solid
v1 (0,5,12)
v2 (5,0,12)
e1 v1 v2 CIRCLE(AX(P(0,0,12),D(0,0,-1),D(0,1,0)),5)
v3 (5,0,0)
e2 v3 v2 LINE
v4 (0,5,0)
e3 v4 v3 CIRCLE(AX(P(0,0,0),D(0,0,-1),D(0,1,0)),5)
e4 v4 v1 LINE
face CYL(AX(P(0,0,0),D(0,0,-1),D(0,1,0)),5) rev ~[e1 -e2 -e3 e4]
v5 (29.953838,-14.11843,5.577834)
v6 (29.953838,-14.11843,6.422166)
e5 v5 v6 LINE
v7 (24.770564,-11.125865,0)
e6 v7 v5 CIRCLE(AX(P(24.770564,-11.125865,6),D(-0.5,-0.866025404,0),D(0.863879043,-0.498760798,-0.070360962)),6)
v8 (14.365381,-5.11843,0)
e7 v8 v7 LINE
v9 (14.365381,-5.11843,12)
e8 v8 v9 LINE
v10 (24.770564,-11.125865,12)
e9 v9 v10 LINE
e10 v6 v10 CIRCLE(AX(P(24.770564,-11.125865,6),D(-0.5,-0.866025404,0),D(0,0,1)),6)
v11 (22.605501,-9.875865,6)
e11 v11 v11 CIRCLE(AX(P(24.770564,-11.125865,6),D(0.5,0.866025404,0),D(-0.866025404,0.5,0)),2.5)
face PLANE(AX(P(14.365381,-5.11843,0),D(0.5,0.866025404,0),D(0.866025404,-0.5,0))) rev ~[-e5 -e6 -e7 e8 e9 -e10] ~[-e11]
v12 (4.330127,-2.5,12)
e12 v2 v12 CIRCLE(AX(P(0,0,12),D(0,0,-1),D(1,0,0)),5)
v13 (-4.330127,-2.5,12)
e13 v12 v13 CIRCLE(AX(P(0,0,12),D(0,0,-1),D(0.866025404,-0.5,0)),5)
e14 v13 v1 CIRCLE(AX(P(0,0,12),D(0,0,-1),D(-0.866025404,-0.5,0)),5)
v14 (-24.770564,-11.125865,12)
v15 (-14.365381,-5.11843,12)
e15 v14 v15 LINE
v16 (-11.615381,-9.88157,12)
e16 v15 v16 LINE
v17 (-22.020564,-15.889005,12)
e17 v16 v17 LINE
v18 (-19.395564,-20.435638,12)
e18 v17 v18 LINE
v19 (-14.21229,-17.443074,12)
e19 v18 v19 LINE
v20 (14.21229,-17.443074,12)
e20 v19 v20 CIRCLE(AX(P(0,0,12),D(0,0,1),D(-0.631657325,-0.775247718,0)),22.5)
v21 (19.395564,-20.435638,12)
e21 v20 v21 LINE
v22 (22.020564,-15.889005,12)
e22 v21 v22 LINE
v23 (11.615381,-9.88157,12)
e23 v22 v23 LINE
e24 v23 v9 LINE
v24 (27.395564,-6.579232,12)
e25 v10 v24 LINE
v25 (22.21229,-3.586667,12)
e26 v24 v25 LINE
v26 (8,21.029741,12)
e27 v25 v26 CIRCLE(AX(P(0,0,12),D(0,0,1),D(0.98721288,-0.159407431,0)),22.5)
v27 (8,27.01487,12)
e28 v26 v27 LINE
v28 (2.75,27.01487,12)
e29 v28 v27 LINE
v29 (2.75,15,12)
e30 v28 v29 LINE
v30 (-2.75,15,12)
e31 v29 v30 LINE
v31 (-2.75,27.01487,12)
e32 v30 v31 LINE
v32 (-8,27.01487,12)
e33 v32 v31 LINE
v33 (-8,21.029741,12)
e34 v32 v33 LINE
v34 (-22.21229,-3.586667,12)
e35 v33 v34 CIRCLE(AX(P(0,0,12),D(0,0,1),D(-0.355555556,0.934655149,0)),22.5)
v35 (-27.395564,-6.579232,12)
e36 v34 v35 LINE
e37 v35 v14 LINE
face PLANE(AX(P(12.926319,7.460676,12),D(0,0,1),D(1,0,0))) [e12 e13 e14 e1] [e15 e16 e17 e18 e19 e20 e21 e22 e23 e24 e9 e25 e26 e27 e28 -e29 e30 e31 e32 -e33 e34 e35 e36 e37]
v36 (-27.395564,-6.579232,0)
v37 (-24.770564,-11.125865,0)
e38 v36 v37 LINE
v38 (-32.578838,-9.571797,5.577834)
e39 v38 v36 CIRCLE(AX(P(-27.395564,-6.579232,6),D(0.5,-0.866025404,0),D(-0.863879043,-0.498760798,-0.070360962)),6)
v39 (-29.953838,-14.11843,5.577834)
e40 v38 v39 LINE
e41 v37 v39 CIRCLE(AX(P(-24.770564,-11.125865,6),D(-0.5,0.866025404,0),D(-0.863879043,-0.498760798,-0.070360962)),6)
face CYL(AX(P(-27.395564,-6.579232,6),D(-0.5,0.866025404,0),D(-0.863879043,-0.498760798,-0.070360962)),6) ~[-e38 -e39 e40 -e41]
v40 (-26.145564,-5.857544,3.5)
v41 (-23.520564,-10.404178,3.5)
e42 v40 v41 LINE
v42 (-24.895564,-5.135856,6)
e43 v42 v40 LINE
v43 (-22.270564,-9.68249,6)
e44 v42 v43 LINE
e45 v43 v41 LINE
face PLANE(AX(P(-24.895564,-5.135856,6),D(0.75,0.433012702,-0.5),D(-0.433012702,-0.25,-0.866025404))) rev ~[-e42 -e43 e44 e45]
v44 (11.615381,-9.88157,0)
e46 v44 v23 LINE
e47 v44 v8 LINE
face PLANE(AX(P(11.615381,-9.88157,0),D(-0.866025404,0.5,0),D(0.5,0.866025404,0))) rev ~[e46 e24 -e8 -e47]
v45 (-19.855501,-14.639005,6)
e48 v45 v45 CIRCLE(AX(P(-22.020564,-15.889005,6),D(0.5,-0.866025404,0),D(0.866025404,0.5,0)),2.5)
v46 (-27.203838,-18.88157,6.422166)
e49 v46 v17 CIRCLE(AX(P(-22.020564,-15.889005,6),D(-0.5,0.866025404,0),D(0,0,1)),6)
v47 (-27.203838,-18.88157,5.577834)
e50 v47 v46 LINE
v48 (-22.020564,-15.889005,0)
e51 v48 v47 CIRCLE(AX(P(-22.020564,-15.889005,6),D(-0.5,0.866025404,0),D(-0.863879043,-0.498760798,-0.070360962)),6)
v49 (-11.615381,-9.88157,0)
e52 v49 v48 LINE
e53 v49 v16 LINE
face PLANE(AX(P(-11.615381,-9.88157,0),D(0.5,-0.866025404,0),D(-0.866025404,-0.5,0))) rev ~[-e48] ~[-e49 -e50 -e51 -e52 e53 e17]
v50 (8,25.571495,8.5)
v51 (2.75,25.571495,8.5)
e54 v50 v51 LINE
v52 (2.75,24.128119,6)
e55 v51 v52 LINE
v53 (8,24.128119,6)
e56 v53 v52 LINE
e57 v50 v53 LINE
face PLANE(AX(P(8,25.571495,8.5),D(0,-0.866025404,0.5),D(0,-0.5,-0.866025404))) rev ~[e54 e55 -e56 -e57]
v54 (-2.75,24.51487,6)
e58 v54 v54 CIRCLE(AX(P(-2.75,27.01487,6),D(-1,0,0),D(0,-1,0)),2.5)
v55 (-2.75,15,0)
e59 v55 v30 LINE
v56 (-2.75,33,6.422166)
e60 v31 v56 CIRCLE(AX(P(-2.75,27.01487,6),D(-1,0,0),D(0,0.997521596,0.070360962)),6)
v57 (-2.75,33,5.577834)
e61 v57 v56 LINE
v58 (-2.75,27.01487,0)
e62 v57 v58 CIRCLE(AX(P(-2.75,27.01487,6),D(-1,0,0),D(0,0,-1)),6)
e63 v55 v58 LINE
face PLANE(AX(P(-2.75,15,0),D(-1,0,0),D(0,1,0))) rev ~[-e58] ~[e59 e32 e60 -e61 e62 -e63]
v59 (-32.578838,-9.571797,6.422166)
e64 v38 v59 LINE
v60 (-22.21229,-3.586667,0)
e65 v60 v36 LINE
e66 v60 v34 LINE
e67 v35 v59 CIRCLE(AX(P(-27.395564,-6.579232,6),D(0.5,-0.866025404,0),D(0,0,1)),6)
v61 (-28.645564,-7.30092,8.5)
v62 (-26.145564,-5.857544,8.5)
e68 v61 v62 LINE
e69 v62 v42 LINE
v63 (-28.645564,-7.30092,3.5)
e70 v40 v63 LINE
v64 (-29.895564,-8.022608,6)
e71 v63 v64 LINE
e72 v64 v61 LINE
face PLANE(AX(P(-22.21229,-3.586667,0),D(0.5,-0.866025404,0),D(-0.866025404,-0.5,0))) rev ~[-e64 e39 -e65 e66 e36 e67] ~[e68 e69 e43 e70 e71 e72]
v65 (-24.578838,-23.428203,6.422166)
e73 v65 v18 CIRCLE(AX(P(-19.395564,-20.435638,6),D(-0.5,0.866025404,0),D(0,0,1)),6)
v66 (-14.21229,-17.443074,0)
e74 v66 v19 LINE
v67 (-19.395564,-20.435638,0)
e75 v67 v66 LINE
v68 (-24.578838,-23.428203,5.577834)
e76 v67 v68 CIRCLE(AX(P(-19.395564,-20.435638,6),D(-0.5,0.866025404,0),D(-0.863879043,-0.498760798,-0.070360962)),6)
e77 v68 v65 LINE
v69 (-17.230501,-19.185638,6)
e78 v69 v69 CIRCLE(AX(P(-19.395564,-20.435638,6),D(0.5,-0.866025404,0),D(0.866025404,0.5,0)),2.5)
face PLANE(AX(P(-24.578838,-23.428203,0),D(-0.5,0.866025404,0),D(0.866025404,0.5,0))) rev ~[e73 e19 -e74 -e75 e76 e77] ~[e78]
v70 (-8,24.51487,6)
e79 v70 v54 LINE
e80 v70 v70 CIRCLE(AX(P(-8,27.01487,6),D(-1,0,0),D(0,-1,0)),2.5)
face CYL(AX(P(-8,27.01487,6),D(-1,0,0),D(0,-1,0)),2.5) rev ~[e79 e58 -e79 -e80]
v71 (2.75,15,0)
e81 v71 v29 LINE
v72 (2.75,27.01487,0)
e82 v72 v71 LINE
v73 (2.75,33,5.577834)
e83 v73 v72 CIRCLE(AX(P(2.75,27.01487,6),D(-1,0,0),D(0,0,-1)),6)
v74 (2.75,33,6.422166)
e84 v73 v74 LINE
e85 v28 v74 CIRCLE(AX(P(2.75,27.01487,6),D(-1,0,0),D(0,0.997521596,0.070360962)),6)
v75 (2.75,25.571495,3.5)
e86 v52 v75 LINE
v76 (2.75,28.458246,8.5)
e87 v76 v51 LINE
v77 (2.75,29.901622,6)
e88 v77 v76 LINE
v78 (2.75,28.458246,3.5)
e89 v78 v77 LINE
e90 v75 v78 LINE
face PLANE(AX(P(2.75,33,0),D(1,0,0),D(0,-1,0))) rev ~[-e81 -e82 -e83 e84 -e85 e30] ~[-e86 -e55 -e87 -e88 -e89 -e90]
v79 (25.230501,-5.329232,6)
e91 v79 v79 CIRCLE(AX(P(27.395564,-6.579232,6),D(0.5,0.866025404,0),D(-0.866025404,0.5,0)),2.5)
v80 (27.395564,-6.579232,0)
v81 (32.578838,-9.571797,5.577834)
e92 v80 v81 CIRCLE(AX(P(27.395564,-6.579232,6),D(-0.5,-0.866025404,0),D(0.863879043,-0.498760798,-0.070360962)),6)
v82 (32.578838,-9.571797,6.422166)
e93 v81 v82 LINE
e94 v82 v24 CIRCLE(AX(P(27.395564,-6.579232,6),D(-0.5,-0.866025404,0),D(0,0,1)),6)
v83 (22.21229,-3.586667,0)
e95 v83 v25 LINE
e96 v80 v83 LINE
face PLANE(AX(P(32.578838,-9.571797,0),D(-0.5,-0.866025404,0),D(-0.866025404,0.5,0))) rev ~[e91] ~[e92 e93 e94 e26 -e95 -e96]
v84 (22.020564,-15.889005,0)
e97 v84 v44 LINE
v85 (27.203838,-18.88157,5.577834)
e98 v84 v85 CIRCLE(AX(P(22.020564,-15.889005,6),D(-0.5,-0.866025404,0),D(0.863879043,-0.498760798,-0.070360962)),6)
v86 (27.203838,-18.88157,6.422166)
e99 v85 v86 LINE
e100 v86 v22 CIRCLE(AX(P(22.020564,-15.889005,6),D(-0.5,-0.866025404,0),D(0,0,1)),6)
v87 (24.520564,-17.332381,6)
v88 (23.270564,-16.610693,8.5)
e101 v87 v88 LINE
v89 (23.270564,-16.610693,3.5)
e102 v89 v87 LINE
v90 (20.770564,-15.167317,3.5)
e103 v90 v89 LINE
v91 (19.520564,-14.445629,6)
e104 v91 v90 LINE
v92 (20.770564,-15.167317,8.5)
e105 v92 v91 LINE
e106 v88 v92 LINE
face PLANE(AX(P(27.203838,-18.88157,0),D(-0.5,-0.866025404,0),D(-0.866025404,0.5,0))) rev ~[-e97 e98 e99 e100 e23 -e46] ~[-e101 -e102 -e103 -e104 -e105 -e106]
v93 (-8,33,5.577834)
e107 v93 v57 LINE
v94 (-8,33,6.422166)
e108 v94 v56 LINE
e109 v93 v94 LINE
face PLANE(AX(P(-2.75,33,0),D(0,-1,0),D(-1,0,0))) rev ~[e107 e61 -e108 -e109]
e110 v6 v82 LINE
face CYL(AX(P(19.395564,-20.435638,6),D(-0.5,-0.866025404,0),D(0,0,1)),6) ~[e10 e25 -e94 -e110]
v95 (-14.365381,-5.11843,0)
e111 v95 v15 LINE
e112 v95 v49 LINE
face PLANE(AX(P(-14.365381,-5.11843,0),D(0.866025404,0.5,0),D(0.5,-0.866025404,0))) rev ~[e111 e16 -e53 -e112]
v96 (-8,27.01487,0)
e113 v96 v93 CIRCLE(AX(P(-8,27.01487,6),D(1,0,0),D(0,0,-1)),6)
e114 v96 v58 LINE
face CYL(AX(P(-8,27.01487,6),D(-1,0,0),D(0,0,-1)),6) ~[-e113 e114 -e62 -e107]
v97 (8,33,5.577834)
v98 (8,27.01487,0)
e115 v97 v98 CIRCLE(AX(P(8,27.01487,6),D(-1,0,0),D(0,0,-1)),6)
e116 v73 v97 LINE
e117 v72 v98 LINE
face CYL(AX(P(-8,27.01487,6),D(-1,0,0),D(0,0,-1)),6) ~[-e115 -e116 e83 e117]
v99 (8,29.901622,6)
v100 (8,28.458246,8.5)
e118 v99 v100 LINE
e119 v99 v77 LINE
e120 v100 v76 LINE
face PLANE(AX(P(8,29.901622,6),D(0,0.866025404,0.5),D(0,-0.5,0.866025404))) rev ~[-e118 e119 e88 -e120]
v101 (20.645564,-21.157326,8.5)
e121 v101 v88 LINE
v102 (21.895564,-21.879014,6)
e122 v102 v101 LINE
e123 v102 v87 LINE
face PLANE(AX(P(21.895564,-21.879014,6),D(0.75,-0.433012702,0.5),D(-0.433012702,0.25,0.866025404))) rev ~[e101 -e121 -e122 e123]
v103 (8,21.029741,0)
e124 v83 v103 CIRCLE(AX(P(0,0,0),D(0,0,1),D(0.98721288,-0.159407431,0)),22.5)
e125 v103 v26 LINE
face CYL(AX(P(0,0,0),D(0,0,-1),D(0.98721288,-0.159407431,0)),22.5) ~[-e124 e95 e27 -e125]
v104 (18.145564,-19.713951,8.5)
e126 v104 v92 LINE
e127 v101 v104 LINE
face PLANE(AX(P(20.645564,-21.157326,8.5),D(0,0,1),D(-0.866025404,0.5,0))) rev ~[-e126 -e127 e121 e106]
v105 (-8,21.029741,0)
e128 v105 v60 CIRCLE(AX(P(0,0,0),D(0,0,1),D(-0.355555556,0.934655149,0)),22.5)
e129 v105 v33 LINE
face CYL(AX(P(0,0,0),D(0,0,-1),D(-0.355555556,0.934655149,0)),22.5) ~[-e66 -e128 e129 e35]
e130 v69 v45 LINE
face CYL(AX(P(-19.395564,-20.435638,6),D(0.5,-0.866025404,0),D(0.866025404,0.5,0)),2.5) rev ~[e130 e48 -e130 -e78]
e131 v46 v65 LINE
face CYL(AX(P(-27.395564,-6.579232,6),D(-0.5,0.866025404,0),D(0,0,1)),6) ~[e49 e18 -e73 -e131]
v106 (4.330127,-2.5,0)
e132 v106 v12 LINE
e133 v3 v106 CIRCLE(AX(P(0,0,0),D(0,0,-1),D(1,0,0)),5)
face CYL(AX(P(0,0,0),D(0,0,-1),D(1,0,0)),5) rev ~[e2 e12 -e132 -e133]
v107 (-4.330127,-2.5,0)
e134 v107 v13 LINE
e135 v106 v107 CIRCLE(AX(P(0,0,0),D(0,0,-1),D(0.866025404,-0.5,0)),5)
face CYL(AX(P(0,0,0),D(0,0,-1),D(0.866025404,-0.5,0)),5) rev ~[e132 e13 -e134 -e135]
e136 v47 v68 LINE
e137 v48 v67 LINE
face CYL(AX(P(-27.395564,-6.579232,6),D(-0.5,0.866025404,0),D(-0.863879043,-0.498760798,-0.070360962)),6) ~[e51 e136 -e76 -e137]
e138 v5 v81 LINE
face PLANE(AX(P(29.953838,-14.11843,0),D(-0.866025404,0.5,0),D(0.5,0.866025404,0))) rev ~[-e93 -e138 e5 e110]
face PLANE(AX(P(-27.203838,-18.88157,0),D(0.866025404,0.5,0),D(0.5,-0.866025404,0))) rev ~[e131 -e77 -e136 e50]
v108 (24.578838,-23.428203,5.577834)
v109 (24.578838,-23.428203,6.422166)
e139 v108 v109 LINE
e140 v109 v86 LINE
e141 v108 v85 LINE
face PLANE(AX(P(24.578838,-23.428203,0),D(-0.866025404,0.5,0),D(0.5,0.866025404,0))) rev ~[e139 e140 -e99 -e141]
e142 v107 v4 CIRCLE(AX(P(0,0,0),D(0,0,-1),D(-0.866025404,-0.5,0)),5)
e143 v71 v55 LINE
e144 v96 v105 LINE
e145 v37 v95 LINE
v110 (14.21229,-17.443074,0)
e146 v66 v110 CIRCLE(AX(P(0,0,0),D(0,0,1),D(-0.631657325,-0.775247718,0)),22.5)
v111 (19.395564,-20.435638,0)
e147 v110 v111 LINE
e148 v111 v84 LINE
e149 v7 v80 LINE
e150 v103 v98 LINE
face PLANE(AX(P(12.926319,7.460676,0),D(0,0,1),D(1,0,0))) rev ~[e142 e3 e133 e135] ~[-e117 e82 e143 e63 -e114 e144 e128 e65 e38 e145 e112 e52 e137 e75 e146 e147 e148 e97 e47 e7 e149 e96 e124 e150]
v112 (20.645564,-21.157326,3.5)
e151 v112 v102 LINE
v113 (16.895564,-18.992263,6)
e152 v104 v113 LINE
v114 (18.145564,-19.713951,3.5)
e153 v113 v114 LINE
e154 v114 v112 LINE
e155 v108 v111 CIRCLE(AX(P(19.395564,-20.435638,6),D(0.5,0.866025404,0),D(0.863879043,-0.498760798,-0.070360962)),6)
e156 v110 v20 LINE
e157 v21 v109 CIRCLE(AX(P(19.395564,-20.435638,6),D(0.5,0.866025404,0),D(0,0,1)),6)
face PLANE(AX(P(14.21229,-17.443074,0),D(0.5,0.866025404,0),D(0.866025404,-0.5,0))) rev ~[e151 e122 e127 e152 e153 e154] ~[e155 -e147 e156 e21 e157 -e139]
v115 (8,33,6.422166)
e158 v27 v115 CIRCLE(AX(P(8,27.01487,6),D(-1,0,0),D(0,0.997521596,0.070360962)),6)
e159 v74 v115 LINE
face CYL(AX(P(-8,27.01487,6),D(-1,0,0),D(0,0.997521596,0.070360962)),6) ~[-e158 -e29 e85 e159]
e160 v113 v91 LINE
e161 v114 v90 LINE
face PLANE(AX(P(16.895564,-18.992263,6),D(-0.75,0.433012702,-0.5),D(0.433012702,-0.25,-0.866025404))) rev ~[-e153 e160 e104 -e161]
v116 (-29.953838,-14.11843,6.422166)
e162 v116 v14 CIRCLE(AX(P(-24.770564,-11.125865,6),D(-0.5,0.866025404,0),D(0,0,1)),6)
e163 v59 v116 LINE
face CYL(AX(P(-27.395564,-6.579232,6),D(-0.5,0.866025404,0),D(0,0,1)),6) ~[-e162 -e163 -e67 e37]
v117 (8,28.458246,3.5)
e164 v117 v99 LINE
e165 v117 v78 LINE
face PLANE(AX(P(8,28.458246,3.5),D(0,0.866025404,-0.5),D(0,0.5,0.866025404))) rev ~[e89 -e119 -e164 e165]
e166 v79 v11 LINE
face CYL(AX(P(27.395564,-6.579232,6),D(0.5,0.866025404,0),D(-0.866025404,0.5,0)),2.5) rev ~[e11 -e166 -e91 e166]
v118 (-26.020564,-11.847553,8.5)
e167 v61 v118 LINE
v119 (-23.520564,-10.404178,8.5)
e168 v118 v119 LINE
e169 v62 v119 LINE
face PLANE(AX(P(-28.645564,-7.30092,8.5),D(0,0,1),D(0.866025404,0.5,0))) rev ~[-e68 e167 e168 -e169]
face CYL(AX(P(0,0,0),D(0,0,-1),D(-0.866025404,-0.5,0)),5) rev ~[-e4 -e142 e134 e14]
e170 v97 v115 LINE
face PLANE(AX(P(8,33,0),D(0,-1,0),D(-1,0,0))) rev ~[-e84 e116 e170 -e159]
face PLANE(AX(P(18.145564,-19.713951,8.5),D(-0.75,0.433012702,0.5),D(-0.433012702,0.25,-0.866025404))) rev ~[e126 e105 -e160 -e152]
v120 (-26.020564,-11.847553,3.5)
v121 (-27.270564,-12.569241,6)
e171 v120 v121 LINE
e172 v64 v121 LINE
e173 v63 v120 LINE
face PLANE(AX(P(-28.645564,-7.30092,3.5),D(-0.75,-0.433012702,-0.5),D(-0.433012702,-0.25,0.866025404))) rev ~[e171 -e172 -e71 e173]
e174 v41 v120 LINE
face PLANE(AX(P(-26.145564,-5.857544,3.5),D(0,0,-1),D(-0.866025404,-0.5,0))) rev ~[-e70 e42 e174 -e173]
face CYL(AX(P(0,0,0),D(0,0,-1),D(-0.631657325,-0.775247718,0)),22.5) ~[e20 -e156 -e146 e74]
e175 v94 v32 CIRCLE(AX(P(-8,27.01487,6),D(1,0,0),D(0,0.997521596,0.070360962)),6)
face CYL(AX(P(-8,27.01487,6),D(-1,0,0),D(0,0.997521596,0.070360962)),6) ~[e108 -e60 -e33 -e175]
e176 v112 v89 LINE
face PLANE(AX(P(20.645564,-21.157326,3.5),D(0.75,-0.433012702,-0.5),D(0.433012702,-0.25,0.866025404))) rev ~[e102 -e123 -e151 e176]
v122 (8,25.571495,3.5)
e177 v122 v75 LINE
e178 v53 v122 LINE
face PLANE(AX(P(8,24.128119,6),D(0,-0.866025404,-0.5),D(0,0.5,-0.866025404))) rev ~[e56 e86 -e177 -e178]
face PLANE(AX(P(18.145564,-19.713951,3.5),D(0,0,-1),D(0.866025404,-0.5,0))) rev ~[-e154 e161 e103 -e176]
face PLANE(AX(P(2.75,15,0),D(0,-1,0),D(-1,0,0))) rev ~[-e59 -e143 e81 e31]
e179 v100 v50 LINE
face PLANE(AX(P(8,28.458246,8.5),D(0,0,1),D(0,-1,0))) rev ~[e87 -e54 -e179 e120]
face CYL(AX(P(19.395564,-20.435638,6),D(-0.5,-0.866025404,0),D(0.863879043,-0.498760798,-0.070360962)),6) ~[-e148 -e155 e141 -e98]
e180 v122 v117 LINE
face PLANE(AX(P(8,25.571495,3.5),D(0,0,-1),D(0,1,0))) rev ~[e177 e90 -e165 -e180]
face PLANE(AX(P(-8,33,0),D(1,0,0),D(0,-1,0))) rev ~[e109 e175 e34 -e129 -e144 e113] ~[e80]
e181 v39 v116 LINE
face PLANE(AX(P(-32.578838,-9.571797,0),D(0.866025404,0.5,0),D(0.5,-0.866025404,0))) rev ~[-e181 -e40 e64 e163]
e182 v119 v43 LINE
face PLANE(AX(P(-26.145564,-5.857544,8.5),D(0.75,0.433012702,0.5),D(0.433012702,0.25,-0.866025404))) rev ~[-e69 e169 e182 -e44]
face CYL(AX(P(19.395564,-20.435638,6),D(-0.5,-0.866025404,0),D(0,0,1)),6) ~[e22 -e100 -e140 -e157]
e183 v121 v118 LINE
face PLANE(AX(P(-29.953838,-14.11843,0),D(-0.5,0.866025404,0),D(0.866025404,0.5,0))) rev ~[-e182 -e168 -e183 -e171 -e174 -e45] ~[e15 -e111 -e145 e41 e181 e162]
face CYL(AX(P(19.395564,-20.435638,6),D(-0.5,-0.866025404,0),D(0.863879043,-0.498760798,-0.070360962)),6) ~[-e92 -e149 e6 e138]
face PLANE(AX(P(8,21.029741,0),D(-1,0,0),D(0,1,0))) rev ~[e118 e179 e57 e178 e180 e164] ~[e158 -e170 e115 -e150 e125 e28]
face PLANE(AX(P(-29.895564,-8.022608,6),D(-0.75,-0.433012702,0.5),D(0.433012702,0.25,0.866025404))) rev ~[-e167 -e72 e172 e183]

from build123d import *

# Parameters (mm, degrees)
F1_DEPTH  = 12
F3_DEPTH  = 25
F5_DEPTH  = 25
F7_DEPTH  = 25
F8_R      = 2.5
F9_DEPTH  = 5.6
F11_DEPTH = 7
F12_R     = 2.5
F13_DEPTH = 7
F15_DEPTH = 7
F16_R     = 2.5
F17_DEPTH = 7
F19_DEPTH = 7


with BuildPart() as f1:
    # F0 (on Top) → F1 (new body)
    with BuildSketch(Plane.XY):
        with BuildLine():
            ThreePointArc((0, 5), (3.5355339059, 3.5355339059), (5, 0))
            ThreePointArc((5, 0), (4.8296291314, -1.2940952255), (4.3301270189, -2.5))
            Line((4.3301270189, -2.5), (12.9903810568, -7.5))
            Line((12.9903810568, -7.5), (14.3653810568, -5.1184301396))
            Line((14.3653810568, -5.1184301396), (29.9538383249, -14.1184301396))
            Line((29.9538383249, -14.1184301396), (32.5788383249, -9.5717967697))
            Line((32.5788383249, -9.5717967697), (22.2122898066, -3.5866671921))
            ThreePointArc((22.2122898066, -3.5866671921), (19.4855715851, 11.25), (8, 21.0297408448))
            Line((8, 21.0297408448), (8, 33))
            Line((8, 33), (2.75, 33))
            Line((2.75, 33), (2.75, 15))
            Line((2.75, 15), (0, 15))
            Line((0, 15), (0, 5))
        make_face()
        with BuildLine():
            ThreePointArc((-4.3301270189, -2.5), (-4.3301270189, 2.5), (0, 5))
            Line((0, 5), (0, 15))
            Line((0, 15), (-2.75, 15))
            Line((-2.75, 15), (-2.75, 33))
            Line((-2.75, 33), (-8, 33))
            Line((-8, 33), (-8, 21.0297408448))
            ThreePointArc((-8, 21.0297408448), (-19.4855715851, 11.25), (-22.2122898066, -3.5866671921))
            Line((-22.2122898066, -3.5866671921), (-32.5788383249, -9.5717967697))
            Line((-32.5788383249, -9.5717967697), (-29.9538383249, -14.1184301396))
            Line((-29.9538383249, -14.1184301396), (-14.3653810568, -5.1184301396))
            Line((-14.3653810568, -5.1184301396), (-12.9903810568, -7.5))
            Line((-12.9903810568, -7.5), (-4.3301270189, -2.5))
        make_face()
        with BuildLine():
            Line((12.9903810568, -7.5), (4.3301270189, -2.5))
            ThreePointArc((4.3301270189, -2.5), (0, -5), (-4.3301270189, -2.5))
            Line((-4.3301270189, -2.5), (-12.9903810568, -7.5))
            Line((-12.9903810568, -7.5), (-11.6153810568, -9.8815698604))
            Line((-11.6153810568, -9.8815698604), (-27.2038383249, -18.8815698604))
            Line((-27.2038383249, -18.8815698604), (-24.5788383249, -23.4282032303))
            Line((-24.5788383249, -23.4282032303), (-14.2122898066, -17.4430736527))
            ThreePointArc((-14.2122898066, -17.4430736527), (0, -22.5), (14.2122898066, -17.4430736527))
            Line((14.2122898066, -17.4430736527), (24.5788383249, -23.4282032303))
            Line((24.5788383249, -23.4282032303), (27.2038383249, -18.8815698604))
            Line((27.2038383249, -18.8815698604), (11.6153810568, -9.8815698604))
            Line((11.6153810568, -9.8815698604), (12.9903810568, -7.5))
        make_face()
    extrude(amount=F1_DEPTH)

    # F2 (on face) → F3 (cut)
    with BuildSketch(Plane(origin=(-8, 0, 0), x_dir=(0, -1, 0), z_dir=(-1, 0, 0))):
        with BuildLine():
            ThreePointArc((-27.0148704224, 0), (-31.1055308437, 1.6106381651), (-33, 5.5778342276))
            Line((-33, 5.5778342276), (-33, 0))
            Line((-33, 0), (-27.0148704224, 0))
        make_face()
        with BuildLine():
            Line((-33, 5.5778342276), (-33, 6.4221657724))
            ThreePointArc((-33, 6.4221657724), (-33.0148704224, 6), (-33, 5.5778342276))
        make_face()
        with BuildLine():
            ThreePointArc((-33, 6.4221657724), (-31.1055308437, 10.3893618349), (-27.0148704224, 12))
            Line((-27.0148704224, 12), (-33, 12))
            Line((-33, 12), (-33, 6.4221657724))
        make_face()
    extrude(amount=-F3_DEPTH, mode=Mode.SUBTRACT)

    # F4 (on face) → F5 (cut)
    with BuildSketch(Plane(origin=(-4, 6.9282032303, 0), x_dir=(-0.8660254038, -0.5, 0), z_dir=(-0.5, 0.8660254038, 0))):
        with BuildLine():
            Line((33, 12), (27.0148704224, 12))
            ThreePointArc((27.0148704224, 12), (31.1055308437, 10.3893618349), (33, 6.4221657724))
            Line((33, 6.4221657724), (33, 12))
        make_face()
        with BuildLine():
            Line((33, 0), (33, 5.5778342276))
            ThreePointArc((33, 5.5778342276), (31.1055308437, 1.6106381651), (27.0148704224, 0))
            Line((27.0148704224, 0), (33, 0))
        make_face()
        with BuildLine():
            ThreePointArc((33, 5.5778342276), (33.0148704224, 6), (33, 6.4221657724))
            Line((33, 6.4221657724), (33, 5.5778342276))
        make_face()
    extrude(amount=-F5_DEPTH, mode=Mode.SUBTRACT)

    # F6 (on face) → F7 (cut)
    with BuildSketch(Plane(origin=(-4, -6.9282032303, 0), x_dir=(0.8660254038, -0.5, 0), z_dir=(-0.5, -0.8660254038, 0))):
        with BuildLine():
            Line((33, 12), (27.0148704224, 12))
            ThreePointArc((27.0148704224, 12), (31.1055308437, 10.3893618349), (33, 6.4221657724))
            Line((33, 6.4221657724), (33, 12))
        make_face()
        with BuildLine():
            Line((33, 0), (33, 5.5778342276))
            ThreePointArc((33, 5.5778342276), (31.1055308437, 1.6106381651), (27.0148704224, 0))
            Line((27.0148704224, 0), (33, 0))
        make_face()
        with BuildLine():
            ThreePointArc((33, 5.5778342276), (33.0148704224, 6), (33, 6.4221657724))
            Line((33, 6.4221657724), (33, 5.5778342276))
        make_face()
    extrude(amount=-F7_DEPTH, mode=Mode.SUBTRACT)

    # F8 (on face) → F9 (cut)
    with BuildSketch(Plane(origin=(4, -6.9282032303, 0), x_dir=(0.8660254038, 0.5, 0), z_dir=(0.5, -0.8660254038, 0))):
        with Locations((-27.0148704224, 6)):
            Circle(F8_R)
    extrude(amount=-F9_DEPTH, mode=Mode.SUBTRACT)

    # F10 (on face) → F11 (cut)
    with BuildSketch(Plane(origin=(-4, 6.9282032303, 0), x_dir=(-0.8660254038, -0.5, 0), z_dir=(-0.5, 0.8660254038, 0))):
        Polygon((28.4582460954, 8.5), (25.5714947494, 8.5), (24.1281190765, 6), (25.5714947494, 3.5), (28.4582460954, 3.5), (29.9016217684, 6), align=None)
    extrude(amount=-F11_DEPTH, mode=Mode.SUBTRACT)

    # F12 (on face) → F13 (cut)
    with BuildSketch(Plane(origin=(-8, 0, 0), x_dir=(0, -1, 0), z_dir=(-1, 0, 0))):
        with Locations((-27.0148704224, 6)):
            Circle(F12_R)
    extrude(amount=-F13_DEPTH, mode=Mode.SUBTRACT)

    # F14 (on face) → F15 (cut)
    with BuildSketch(Plane.YZ.offset(8)):
        Polygon((28.4582460954, 8.5), (25.5714947494, 8.5), (24.1281190765, 6), (25.5714947494, 3.5), (28.4582460954, 3.5), (29.9016217684, 6), align=None)
    extrude(amount=-F15_DEPTH, mode=Mode.SUBTRACT)

    # F16 (on face) → F17 (cut)
    with BuildSketch(Plane(origin=(4, 6.9282032303, 0), x_dir=(-0.8660254038, 0.5, 0), z_dir=(0.5, 0.8660254038, 0))):
        with Locations((-27.0148704224, 6)):
            Circle(F16_R)
    extrude(amount=-F17_DEPTH, mode=Mode.SUBTRACT)

    # F18 (on face) → F19 (cut)
    with BuildSketch(Plane(origin=(-4, -6.9282032303, 0), x_dir=(0.8660254038, -0.5, 0), z_dir=(-0.5, -0.8660254038, 0))):
        Polygon((28.4582460954, 8.5), (25.5714947494, 8.5), (24.1281190765, 6), (25.5714947494, 3.5), (28.4582460954, 3.5), (29.9016217684, 6), align=None)
    extrude(amount=-F19_DEPTH, mode=Mode.SUBTRACT)


solid = f1.part
